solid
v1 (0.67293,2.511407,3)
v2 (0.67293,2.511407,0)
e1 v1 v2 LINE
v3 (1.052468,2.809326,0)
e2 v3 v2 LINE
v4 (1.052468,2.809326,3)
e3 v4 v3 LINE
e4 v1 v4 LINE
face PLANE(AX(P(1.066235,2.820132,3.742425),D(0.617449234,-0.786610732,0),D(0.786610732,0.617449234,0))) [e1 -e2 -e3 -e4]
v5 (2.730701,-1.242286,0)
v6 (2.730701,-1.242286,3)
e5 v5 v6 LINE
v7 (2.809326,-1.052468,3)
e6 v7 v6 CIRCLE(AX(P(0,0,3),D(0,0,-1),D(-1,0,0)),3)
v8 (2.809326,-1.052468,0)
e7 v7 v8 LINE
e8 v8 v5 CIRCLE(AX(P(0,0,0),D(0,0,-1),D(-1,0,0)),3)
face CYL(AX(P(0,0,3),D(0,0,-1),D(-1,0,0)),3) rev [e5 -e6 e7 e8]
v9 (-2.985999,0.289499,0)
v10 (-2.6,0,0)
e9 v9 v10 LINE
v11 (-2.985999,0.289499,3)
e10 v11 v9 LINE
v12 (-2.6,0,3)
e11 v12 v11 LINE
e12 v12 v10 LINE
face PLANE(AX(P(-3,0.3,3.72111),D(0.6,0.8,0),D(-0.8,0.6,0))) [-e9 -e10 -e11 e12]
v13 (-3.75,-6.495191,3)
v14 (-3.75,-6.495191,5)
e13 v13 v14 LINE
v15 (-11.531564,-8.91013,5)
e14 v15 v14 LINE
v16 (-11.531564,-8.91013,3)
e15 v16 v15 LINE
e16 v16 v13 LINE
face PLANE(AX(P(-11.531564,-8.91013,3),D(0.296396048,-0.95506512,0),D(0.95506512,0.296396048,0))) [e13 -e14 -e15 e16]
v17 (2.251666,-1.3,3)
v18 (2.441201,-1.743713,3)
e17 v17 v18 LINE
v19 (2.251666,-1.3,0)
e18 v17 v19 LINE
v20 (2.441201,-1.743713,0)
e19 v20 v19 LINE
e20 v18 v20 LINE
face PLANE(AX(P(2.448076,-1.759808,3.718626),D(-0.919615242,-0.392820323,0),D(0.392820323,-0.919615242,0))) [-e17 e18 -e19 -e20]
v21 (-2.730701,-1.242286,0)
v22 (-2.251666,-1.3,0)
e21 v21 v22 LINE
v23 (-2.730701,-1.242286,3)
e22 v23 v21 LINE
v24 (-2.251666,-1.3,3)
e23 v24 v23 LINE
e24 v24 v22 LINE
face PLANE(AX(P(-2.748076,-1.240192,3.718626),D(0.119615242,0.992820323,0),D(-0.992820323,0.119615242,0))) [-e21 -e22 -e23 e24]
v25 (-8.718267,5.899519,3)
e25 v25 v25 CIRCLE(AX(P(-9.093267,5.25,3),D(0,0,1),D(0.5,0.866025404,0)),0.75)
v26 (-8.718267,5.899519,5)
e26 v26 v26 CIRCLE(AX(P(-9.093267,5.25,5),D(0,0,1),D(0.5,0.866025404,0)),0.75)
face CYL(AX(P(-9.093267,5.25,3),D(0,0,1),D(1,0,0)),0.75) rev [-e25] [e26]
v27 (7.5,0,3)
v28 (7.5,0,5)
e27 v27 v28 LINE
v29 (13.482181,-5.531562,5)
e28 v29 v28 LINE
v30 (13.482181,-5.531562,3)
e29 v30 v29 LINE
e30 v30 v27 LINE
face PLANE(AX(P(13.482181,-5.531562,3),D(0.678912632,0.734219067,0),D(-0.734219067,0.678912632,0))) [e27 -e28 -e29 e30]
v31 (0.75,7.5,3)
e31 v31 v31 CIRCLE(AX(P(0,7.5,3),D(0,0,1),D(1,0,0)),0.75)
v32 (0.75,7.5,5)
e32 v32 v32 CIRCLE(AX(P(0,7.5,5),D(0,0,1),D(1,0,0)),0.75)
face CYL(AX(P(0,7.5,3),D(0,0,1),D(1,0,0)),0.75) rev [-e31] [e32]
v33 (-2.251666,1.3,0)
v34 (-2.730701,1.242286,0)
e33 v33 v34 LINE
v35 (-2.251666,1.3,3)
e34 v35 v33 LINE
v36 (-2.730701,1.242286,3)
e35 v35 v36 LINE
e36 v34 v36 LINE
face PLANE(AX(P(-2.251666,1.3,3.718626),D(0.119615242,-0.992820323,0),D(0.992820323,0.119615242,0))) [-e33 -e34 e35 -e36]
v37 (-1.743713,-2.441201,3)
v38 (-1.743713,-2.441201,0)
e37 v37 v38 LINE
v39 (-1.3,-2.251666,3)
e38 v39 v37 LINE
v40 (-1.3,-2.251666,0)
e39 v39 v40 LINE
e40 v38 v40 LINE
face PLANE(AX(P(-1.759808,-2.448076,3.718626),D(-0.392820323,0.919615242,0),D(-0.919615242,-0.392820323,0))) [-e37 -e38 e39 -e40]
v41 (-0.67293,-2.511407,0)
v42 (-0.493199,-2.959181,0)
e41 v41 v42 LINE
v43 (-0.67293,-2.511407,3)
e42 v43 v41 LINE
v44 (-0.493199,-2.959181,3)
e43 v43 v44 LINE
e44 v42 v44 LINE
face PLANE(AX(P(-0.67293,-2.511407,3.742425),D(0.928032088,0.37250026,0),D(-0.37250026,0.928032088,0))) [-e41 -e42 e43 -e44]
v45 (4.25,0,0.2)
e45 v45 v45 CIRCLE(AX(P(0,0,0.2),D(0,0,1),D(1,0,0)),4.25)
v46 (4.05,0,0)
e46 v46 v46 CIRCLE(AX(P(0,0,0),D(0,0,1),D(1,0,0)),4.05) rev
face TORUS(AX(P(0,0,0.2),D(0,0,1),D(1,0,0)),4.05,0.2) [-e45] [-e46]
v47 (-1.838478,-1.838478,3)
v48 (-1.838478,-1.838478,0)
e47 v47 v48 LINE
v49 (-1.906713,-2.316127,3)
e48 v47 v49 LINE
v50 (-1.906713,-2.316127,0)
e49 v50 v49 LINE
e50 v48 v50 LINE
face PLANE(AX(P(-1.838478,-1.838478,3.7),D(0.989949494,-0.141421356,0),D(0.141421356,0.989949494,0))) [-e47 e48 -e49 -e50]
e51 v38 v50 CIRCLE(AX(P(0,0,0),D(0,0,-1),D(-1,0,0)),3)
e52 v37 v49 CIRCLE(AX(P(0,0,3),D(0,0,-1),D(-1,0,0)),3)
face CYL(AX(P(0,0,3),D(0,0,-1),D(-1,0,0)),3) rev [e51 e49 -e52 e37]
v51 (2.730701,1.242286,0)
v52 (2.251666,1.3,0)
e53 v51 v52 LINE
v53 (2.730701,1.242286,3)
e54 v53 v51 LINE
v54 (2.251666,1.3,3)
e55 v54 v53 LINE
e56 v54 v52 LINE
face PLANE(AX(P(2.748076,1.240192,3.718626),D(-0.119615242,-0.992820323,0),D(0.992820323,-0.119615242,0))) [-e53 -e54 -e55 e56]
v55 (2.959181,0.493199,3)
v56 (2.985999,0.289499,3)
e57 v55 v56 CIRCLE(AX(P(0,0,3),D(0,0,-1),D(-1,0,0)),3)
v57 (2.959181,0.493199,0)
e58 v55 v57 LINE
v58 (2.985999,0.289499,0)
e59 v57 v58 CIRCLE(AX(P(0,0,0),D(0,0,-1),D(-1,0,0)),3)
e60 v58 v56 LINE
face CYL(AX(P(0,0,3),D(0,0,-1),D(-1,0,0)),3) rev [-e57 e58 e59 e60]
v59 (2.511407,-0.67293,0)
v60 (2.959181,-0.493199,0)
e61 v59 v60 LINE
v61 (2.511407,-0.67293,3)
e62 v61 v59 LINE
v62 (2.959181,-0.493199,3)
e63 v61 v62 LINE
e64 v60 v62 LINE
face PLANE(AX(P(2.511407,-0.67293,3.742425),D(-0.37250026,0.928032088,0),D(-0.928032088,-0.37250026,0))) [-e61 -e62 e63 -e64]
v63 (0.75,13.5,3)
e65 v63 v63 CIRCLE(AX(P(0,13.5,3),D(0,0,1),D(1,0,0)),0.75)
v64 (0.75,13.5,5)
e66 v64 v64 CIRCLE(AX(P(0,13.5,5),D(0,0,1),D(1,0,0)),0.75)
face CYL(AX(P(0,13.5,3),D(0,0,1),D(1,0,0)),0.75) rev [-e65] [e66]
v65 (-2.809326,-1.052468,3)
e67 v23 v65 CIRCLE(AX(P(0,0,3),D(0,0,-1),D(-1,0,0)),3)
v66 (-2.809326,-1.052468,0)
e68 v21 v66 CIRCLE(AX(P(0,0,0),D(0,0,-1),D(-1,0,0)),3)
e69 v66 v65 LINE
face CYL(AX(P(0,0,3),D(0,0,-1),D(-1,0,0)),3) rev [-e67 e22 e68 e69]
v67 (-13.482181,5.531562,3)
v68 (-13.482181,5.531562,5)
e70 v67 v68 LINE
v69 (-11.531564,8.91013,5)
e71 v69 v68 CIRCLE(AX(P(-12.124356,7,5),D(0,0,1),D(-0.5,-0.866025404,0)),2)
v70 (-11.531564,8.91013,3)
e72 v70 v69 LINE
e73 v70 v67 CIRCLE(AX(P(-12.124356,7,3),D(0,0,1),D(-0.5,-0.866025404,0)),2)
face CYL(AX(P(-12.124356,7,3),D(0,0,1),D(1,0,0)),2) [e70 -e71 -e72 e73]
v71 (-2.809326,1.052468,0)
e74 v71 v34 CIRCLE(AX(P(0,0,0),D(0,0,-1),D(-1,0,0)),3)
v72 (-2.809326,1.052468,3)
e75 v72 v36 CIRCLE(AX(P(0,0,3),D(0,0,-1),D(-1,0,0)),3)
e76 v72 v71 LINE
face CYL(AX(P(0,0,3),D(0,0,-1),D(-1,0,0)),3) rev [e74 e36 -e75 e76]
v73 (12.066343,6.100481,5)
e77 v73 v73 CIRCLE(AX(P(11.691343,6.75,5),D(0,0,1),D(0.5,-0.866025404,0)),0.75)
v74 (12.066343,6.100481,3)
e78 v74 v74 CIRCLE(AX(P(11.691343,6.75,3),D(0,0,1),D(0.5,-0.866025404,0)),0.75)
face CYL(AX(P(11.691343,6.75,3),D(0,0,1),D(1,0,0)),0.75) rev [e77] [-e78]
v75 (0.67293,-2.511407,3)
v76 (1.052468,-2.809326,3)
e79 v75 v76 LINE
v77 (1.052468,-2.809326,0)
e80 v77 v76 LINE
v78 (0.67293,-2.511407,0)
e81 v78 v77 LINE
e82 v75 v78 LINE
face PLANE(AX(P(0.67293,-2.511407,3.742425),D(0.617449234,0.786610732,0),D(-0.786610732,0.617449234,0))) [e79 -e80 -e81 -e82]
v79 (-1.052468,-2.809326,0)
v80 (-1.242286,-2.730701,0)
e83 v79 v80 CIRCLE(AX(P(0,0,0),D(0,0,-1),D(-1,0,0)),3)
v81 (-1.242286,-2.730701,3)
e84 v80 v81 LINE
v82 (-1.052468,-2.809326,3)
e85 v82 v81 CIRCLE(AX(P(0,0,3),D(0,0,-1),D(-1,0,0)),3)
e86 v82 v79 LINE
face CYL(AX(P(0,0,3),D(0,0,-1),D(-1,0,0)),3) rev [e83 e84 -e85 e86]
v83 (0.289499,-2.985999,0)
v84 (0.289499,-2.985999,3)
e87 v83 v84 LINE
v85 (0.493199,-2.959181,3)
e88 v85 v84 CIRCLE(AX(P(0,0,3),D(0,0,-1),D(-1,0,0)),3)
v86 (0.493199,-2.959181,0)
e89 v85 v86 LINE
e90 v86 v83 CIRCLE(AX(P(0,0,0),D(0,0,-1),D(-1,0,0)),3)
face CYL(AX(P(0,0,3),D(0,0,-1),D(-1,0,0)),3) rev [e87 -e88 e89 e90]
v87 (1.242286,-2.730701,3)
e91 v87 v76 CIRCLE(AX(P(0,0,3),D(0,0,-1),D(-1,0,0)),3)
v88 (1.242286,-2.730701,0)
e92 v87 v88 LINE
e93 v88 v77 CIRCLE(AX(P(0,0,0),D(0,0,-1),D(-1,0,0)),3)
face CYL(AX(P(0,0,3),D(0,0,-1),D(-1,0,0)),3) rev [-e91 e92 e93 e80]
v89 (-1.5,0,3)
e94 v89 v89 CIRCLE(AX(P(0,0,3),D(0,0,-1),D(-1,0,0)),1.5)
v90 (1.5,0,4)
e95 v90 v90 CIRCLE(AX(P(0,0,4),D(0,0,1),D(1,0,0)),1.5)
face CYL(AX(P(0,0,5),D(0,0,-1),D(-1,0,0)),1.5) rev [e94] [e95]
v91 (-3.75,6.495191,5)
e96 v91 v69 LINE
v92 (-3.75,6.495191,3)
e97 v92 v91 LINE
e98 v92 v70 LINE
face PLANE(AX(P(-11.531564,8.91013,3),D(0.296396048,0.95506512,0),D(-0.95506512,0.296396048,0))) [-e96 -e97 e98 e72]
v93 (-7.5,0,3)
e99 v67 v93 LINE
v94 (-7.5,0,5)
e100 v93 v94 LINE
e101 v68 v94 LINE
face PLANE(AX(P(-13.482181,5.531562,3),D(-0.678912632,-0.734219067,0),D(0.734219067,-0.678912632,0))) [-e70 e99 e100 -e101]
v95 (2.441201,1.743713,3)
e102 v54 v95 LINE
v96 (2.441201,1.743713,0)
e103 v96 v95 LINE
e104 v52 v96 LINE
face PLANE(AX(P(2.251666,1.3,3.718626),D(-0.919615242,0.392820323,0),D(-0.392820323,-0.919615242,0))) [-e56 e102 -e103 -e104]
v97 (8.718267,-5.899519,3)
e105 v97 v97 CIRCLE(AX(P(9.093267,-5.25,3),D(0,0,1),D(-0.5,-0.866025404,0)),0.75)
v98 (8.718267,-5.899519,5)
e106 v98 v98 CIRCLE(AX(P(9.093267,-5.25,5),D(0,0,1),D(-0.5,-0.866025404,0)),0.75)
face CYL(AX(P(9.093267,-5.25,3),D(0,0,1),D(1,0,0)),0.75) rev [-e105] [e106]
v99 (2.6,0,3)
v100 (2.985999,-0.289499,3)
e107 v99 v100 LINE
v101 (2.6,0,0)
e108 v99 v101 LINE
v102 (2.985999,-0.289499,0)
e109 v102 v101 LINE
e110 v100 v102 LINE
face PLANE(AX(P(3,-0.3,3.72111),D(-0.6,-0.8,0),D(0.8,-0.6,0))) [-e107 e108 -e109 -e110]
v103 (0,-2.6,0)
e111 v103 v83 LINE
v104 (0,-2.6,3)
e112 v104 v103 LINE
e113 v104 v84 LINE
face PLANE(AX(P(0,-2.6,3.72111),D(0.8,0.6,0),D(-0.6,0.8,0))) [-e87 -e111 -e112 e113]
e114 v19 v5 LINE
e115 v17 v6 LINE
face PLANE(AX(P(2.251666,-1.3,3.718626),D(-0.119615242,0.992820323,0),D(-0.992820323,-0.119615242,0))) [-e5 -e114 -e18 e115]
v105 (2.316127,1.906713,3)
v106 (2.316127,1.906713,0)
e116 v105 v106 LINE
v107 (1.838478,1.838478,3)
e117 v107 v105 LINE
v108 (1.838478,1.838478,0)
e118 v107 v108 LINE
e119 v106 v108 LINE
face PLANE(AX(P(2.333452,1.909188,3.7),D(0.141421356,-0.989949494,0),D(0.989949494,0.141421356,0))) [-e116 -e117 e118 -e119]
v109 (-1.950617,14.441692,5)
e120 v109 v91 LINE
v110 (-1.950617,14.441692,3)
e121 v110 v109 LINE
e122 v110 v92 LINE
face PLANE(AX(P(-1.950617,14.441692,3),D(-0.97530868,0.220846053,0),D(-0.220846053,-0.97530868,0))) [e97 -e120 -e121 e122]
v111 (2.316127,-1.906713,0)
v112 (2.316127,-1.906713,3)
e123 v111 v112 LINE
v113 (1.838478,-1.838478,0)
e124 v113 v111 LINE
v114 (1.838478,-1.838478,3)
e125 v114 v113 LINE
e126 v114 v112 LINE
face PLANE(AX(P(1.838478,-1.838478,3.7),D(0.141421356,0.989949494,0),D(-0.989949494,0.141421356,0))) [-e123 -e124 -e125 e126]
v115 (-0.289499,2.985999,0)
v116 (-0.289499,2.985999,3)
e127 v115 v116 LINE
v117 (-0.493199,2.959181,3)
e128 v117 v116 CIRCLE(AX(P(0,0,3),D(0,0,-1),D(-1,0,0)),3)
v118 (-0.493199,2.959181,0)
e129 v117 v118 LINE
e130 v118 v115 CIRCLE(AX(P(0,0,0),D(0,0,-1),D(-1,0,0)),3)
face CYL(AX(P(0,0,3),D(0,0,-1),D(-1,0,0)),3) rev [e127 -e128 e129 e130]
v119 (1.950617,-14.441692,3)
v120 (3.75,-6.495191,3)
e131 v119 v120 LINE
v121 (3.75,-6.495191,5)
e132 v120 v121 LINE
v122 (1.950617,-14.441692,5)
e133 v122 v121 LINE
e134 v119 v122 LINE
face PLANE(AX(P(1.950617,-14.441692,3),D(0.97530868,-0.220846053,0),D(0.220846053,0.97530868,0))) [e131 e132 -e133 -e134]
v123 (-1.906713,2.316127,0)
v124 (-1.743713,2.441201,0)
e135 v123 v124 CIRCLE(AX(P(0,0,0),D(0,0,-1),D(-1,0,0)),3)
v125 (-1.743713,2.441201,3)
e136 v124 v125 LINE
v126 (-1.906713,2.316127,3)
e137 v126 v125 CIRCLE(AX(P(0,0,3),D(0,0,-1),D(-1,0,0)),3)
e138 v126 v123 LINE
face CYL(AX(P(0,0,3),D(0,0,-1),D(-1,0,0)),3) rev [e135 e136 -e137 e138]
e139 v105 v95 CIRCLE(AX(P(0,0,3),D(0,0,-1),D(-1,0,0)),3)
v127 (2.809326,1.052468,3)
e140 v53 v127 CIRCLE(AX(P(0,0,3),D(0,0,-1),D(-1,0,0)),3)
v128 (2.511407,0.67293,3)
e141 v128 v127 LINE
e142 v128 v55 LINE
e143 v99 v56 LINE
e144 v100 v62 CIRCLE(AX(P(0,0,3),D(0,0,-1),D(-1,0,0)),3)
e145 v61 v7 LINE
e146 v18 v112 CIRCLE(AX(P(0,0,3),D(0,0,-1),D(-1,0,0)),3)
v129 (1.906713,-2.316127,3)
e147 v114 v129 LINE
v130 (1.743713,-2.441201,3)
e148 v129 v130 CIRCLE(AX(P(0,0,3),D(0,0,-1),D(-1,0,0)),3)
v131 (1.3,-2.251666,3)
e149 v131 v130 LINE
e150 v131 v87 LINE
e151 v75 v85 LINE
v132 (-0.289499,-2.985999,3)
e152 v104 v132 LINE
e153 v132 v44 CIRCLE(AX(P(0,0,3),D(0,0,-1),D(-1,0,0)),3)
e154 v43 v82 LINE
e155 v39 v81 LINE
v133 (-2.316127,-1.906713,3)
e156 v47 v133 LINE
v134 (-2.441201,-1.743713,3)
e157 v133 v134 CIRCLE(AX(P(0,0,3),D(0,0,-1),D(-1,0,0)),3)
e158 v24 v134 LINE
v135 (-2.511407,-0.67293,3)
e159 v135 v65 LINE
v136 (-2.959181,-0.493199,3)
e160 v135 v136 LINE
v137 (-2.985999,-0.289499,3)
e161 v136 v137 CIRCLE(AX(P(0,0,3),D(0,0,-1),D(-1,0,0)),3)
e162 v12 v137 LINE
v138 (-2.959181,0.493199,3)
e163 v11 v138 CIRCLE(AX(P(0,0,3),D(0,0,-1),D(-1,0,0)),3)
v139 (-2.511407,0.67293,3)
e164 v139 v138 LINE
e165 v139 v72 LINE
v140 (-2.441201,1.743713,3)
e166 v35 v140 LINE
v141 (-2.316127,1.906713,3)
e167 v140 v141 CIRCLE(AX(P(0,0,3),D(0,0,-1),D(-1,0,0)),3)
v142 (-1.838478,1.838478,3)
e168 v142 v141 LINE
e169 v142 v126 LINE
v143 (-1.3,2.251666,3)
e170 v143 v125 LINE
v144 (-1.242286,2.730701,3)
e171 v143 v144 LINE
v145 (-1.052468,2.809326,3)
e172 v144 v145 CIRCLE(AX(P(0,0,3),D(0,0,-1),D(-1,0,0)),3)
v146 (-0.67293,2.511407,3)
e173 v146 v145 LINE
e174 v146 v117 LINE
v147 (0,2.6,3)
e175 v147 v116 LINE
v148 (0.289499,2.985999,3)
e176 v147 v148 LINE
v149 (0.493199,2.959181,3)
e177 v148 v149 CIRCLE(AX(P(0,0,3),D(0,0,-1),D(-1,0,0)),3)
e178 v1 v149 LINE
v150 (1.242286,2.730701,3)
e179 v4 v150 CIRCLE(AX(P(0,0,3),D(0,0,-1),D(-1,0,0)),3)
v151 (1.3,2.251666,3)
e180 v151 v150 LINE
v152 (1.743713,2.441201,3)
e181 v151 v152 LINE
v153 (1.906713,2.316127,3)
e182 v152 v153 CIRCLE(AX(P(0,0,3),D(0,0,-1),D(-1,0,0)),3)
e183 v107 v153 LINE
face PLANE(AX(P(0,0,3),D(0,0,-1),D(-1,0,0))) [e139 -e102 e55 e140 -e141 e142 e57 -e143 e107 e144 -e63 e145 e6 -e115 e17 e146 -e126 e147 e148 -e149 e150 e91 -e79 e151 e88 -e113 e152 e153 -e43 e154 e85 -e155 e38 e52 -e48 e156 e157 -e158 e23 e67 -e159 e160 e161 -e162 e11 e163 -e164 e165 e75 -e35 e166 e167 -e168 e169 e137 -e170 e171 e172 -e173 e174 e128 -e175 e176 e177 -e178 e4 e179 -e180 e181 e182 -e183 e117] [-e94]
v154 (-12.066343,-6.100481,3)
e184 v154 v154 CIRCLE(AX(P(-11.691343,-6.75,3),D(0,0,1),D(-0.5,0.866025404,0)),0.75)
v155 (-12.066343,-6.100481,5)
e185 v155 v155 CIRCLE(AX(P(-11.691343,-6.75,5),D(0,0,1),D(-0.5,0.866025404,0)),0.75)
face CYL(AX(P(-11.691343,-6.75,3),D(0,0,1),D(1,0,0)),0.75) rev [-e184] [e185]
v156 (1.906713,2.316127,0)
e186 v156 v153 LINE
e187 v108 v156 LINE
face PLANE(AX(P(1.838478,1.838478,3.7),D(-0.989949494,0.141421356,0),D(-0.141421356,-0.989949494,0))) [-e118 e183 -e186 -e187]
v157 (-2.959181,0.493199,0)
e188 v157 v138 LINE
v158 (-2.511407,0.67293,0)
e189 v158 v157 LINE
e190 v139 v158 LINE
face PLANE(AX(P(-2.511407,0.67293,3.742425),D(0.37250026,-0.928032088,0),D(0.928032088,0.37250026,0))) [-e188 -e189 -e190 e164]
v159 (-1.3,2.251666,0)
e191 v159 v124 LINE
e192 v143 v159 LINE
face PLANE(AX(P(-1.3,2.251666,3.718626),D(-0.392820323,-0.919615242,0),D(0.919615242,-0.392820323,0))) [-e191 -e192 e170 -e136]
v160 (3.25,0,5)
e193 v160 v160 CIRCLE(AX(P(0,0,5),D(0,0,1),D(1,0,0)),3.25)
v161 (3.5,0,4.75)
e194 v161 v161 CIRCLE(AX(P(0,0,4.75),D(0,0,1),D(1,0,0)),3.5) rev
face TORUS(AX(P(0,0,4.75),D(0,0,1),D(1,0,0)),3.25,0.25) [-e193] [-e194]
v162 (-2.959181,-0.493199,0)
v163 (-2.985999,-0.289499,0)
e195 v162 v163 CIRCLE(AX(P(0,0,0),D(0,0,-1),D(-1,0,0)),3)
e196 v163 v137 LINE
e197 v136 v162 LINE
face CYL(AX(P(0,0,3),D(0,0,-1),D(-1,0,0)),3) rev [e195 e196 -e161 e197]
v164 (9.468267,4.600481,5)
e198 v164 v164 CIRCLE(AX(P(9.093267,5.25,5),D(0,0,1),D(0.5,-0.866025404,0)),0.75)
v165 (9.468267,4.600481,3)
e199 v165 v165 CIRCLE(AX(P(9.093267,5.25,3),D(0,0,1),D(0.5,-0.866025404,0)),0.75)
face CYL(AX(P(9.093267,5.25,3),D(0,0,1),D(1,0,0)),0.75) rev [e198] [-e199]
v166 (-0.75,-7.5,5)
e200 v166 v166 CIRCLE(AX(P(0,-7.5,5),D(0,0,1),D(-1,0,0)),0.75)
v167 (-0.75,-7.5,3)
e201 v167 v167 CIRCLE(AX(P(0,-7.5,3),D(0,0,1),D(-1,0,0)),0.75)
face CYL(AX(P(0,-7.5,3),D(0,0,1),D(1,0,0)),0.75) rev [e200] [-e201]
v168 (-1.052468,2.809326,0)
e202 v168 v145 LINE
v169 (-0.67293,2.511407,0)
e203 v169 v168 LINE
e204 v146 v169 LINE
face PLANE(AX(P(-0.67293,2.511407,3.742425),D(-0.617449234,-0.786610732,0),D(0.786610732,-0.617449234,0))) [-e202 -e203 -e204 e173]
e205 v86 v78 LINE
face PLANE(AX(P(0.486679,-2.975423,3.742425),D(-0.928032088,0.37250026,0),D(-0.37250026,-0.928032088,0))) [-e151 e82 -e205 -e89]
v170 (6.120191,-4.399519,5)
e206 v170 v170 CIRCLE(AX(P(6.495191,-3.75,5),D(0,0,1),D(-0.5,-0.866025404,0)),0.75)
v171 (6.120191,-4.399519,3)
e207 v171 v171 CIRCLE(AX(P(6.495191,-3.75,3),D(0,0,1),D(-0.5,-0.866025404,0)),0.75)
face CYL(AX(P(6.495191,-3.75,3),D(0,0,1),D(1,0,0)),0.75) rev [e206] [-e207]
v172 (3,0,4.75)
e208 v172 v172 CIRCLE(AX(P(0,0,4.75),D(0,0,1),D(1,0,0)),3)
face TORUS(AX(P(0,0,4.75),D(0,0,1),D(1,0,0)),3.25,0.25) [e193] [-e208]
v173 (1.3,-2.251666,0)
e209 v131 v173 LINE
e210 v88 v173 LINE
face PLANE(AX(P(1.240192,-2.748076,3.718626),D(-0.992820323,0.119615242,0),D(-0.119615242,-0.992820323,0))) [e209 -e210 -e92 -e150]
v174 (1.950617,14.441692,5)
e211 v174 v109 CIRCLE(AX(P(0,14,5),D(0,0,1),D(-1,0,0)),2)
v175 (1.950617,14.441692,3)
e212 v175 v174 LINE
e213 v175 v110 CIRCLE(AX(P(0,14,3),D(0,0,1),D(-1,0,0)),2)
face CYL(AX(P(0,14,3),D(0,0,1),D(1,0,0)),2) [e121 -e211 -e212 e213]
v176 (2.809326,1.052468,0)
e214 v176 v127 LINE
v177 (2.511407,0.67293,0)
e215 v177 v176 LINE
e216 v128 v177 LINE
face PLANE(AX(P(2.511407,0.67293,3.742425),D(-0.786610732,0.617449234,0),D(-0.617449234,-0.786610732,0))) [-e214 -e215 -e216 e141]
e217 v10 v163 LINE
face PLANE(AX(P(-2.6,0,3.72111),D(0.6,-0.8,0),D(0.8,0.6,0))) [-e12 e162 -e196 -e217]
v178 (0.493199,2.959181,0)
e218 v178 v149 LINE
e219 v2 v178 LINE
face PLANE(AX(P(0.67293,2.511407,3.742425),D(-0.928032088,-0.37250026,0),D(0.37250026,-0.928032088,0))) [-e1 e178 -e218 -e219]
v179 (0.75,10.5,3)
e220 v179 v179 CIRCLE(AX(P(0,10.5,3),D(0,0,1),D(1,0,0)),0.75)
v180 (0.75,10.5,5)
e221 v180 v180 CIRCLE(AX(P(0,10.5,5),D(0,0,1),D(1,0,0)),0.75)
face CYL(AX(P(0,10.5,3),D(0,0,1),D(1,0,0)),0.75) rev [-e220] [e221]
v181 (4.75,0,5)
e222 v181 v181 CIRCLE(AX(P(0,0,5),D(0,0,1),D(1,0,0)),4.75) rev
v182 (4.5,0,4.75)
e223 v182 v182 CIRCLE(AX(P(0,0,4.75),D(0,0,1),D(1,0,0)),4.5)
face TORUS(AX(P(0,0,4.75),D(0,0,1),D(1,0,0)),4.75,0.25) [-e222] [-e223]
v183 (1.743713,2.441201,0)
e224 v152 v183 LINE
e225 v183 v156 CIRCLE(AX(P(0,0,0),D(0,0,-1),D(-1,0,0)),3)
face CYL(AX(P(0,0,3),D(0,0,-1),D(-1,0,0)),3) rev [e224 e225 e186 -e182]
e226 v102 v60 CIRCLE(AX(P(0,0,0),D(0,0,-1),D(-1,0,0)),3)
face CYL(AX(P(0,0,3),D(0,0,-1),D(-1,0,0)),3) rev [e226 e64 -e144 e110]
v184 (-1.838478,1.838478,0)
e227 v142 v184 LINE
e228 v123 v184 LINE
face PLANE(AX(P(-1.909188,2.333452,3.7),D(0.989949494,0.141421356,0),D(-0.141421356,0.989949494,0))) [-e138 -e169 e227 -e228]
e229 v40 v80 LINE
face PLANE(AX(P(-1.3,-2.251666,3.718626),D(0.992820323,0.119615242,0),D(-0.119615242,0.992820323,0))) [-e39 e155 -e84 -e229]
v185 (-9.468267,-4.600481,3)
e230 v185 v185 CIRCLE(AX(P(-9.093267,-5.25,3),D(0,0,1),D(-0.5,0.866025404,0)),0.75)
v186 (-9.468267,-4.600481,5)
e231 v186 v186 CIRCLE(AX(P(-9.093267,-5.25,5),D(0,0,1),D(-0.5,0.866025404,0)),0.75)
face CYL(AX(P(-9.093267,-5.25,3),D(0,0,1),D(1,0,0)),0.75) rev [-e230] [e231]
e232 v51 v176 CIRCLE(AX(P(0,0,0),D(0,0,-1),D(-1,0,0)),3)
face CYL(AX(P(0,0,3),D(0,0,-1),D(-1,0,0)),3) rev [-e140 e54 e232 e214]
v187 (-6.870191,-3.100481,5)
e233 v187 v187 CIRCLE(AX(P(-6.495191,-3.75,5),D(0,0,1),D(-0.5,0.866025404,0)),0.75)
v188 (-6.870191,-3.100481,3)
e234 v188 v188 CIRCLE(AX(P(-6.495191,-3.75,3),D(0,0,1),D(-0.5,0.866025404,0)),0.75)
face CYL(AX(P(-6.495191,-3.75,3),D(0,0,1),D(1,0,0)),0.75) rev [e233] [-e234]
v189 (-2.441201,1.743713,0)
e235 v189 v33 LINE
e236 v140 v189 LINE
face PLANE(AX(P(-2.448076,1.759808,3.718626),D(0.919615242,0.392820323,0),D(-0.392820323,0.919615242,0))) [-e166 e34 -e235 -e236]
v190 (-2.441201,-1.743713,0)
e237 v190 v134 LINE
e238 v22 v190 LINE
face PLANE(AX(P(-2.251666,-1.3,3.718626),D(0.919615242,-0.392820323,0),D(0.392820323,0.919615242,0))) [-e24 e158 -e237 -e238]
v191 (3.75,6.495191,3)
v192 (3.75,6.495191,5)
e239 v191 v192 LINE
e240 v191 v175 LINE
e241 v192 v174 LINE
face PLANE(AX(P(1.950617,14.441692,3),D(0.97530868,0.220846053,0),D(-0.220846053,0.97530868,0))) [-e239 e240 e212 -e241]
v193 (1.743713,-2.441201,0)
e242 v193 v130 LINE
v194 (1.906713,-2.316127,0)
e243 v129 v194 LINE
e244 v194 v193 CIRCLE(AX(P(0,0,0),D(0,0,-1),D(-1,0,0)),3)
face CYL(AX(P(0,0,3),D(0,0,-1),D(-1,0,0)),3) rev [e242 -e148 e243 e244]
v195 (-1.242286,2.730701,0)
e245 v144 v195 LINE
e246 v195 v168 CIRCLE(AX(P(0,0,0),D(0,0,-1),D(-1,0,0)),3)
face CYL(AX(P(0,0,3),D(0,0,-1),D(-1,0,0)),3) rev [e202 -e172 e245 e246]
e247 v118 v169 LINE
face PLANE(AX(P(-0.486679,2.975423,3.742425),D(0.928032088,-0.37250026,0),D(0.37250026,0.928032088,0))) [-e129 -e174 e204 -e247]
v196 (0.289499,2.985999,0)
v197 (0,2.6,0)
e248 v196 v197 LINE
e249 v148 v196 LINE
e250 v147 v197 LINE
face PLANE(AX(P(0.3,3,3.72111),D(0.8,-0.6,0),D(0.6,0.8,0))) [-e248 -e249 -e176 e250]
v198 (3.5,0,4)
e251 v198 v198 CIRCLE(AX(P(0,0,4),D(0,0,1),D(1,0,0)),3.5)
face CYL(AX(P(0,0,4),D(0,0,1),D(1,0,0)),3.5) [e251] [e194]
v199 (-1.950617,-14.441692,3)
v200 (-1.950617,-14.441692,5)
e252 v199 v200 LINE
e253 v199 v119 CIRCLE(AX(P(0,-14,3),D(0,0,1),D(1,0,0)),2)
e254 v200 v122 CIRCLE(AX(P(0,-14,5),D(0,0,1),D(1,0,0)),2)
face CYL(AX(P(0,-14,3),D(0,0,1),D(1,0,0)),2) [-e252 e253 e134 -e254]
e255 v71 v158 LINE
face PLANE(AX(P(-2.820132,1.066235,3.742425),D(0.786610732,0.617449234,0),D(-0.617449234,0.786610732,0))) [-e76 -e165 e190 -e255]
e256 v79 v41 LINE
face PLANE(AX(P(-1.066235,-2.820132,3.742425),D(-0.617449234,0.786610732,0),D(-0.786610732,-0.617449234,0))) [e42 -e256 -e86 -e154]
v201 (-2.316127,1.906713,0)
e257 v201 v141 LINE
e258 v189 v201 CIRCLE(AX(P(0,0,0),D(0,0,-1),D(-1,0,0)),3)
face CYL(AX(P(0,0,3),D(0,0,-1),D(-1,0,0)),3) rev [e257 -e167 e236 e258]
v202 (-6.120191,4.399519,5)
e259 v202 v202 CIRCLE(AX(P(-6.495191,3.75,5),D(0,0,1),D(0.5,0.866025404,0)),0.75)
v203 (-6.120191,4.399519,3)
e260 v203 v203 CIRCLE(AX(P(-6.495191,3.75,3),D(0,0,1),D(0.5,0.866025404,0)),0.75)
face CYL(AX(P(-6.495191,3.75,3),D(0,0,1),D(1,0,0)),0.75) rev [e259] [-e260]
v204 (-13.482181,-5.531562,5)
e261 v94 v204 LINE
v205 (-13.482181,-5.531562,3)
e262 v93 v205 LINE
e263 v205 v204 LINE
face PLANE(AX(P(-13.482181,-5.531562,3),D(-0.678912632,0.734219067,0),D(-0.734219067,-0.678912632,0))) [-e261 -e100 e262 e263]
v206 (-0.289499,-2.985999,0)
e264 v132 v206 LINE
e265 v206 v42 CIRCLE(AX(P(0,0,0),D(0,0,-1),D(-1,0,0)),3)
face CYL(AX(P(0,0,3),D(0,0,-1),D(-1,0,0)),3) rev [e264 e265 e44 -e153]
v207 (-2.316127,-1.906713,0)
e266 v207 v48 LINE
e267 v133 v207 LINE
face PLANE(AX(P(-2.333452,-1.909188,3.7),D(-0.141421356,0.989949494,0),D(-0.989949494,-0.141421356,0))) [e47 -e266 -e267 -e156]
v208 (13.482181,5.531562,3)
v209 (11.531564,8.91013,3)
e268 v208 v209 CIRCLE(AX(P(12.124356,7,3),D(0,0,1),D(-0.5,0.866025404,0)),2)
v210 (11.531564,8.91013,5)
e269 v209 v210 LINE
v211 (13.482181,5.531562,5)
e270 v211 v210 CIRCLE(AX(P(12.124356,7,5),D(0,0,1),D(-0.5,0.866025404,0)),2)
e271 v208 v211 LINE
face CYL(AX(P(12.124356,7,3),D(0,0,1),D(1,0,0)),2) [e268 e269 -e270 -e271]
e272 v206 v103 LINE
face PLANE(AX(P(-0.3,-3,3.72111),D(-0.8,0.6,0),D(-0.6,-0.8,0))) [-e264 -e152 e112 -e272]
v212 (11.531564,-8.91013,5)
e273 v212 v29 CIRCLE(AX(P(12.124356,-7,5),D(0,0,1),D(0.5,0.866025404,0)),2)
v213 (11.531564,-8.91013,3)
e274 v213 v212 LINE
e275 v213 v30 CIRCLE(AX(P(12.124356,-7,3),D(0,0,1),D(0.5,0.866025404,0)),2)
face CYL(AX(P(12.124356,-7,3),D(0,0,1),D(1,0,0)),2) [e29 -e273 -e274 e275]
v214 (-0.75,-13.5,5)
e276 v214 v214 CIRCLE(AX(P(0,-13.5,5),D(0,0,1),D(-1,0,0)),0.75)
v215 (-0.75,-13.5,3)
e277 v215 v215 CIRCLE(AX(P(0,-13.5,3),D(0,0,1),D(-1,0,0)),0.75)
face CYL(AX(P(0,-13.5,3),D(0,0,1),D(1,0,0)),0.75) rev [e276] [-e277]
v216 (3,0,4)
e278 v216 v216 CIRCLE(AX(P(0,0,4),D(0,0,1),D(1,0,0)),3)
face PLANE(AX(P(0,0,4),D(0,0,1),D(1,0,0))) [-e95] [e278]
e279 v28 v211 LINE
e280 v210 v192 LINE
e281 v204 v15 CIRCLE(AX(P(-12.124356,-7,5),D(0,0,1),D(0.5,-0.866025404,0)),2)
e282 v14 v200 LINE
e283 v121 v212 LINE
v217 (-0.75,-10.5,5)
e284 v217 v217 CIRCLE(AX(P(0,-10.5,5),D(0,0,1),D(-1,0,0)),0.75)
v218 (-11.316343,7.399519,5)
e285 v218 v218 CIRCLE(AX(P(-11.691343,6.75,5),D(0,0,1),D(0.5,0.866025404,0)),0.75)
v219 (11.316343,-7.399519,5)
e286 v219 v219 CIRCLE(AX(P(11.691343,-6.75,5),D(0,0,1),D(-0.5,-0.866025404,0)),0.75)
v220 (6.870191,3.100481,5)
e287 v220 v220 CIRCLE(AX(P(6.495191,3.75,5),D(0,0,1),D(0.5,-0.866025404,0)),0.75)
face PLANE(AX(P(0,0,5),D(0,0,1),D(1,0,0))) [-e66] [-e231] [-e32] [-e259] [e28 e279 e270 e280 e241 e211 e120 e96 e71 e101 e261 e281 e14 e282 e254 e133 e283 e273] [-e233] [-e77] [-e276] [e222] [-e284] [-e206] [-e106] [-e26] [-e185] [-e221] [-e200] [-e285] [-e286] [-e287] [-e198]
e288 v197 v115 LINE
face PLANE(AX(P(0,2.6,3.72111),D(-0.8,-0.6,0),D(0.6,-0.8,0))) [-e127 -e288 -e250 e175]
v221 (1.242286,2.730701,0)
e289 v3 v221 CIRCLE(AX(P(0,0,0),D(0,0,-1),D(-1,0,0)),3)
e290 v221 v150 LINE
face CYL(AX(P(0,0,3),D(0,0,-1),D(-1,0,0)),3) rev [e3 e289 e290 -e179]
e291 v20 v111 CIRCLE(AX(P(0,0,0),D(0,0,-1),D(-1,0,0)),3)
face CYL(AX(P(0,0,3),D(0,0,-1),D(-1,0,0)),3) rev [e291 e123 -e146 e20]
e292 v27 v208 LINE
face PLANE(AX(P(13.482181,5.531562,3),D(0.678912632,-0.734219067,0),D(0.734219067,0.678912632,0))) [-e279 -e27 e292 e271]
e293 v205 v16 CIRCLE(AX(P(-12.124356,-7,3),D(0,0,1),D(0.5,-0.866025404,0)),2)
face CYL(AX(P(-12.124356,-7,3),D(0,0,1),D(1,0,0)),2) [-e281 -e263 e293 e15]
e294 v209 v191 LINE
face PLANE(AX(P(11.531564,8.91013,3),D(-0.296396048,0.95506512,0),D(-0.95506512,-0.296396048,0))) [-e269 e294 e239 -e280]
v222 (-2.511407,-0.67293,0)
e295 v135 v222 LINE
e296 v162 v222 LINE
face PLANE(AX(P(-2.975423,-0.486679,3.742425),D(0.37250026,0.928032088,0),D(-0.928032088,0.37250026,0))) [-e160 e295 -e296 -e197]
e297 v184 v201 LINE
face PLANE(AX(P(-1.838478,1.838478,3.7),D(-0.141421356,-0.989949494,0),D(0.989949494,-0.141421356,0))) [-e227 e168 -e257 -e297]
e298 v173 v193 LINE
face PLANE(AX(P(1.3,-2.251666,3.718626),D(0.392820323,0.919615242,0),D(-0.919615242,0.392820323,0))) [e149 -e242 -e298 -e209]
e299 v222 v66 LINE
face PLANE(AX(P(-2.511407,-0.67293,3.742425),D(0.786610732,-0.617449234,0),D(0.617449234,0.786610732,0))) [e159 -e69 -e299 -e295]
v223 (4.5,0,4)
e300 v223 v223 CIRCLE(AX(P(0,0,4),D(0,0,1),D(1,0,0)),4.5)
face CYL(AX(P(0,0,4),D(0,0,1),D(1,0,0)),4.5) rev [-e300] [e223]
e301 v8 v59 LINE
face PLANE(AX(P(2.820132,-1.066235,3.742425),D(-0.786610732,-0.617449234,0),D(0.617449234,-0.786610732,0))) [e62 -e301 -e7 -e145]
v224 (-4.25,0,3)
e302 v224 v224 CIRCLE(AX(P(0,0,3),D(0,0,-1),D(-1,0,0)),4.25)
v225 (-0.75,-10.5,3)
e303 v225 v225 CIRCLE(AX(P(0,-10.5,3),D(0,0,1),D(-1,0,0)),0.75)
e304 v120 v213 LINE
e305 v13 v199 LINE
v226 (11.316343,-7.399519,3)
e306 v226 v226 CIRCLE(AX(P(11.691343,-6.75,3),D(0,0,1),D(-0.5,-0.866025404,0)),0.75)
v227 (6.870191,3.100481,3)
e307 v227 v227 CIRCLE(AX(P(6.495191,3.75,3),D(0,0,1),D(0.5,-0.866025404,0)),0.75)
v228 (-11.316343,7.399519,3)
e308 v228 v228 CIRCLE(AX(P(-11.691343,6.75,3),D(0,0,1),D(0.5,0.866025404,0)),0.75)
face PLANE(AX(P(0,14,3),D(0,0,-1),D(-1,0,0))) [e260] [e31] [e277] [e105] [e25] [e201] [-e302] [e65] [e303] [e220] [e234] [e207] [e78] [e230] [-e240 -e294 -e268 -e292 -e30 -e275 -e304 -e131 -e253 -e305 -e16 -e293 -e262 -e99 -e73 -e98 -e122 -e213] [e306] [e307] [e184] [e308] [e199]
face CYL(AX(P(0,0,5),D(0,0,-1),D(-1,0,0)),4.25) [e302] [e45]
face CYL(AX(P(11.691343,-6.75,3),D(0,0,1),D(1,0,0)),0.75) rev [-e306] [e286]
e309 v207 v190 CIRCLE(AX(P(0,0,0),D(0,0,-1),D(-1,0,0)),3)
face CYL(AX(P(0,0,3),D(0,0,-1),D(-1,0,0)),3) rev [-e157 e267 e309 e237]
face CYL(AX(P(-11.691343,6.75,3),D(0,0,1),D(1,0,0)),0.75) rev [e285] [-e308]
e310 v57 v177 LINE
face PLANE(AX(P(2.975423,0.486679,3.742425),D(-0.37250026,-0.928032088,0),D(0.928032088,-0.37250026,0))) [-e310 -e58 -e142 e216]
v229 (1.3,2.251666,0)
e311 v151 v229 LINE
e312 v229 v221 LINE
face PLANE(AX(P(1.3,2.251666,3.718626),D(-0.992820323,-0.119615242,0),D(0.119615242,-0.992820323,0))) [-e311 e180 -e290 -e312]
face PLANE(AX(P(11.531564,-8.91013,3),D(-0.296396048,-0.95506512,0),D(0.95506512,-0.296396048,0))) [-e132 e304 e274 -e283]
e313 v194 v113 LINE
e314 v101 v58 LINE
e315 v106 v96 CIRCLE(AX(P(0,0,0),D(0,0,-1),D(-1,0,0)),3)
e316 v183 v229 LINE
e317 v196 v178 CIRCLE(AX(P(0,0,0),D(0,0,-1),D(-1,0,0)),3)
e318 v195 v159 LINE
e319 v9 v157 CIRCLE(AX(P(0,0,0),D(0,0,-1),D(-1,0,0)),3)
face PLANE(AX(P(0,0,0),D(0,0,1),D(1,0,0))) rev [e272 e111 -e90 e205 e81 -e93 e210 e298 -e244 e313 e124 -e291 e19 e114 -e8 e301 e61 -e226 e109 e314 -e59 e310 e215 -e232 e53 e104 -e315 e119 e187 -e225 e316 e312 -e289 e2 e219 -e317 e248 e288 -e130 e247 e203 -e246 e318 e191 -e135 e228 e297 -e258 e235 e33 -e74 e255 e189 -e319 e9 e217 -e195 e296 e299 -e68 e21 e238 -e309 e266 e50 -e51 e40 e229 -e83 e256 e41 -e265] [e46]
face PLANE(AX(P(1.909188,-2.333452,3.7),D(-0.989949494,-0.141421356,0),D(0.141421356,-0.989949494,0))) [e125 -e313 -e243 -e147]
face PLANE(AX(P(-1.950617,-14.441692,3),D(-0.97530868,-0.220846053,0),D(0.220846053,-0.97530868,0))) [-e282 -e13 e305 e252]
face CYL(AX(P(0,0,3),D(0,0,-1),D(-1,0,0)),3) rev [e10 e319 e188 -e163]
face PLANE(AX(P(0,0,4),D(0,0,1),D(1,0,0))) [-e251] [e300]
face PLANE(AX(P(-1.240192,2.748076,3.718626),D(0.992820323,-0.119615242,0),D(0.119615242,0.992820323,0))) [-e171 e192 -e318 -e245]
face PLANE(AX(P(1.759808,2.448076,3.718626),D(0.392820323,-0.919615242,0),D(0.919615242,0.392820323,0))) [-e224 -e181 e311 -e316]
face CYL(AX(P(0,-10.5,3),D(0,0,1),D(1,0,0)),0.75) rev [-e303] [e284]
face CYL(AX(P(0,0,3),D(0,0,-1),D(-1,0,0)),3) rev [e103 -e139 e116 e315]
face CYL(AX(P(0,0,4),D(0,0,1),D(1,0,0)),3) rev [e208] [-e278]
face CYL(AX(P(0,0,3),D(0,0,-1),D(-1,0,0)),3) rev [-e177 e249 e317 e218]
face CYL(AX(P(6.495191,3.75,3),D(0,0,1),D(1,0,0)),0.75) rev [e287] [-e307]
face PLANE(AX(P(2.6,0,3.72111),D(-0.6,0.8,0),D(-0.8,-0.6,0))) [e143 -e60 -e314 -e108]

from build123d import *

# Parameters (mm, degrees)
ESQUISSE1_R                  = 4.25
ESQUISSE1_R_2                = 1.5
BOSS_EXTRU_1_DEPTH           = 5
ESQUISSE2_R                  = 3
ENL_V_MAT_EXTRU_1_DEPTH      = 3
BOSS_EXTRU_2_DEPTH           = 3
R_P_TITION_CIRCULAIRE1_DEPTH = 3
ESQUISSE4_R                  = 0.75
BOSS_EXTRU_3_DEPTH           = 2
R_P_TITION_CIRCULAIRE2_COUNT = 6
ENL_V_START                  = -1
ESQUISSE5_R                  = 3
ENL_V_MAT_EXTRU_2_DEPTH      = 1
CONG_1_R                     = 0.2
ESQUISSE6_R                  = 4.5
ESQUISSE6_R_2                = 3.5
ENL_V_MAT_EXTRU_3_DEPTH      = 1
CONG_2_R                     = 0.25


# Read off the part's stored shape, not the designer's step: Répétition circulaire1
with BuildPart() as part:
    # Esquisse1 → Boss.-Extru.1 (new body)
    with BuildSketch(Plane.XY):
        Circle(ESQUISSE1_R)
        Circle(ESQUISSE1_R_2, mode=Mode.SUBTRACT)
    extrude(amount=BOSS_EXTRU_1_DEPTH)

    # Esquisse2 → Enlèv. mat.-Extru.1 (cut)
    with BuildSketch(Plane(origin=(0, 0, 0), x_dir=(-1, 0, 0), z_dir=(0, 0, -1))):
        Circle(ESQUISSE2_R)
    extrude(amount=-ENL_V_MAT_EXTRU_1_DEPTH, mode=Mode.SUBTRACT)

    # Esquisse3 → Boss.-Extru.2 (add)
    with BuildSketch(Plane(origin=(0, 0, 0), x_dir=(-1, 0, 0), z_dir=(0, 0, -1))):
        Polygon((-0.3, 3), (0, 2.6), (0.3, 3), align=None)
    extrude(amount=-BOSS_EXTRU_2_DEPTH)

    # Répétition circulaire1 outline → Répétition circulaire1 (add)
    with BuildSketch(Plane.XY):
        with BuildLine():
            ThreePointArc((1.052468236, 2.80932565), (0.776457135, 2.897777479), (0.493198596, 2.959181499))
            Line((0.493198596, 2.959181499), (0.672929517, 2.511407148))
            Line((0.672929517, 2.511407148), (1.052468236, 2.80932565))
        make_face()
        with BuildLine():
            ThreePointArc((-0.493198596, 2.959181499), (-0.776457135, 2.897777479), (-1.052468236, 2.80932565))
            Line((-1.052468236, 2.80932565), (-0.672929517, 2.511407148))
            Line((-0.672929517, 2.511407148), (-0.493198596, 2.959181499))
        make_face()
        with BuildLine():
            ThreePointArc((-1.242285791, 2.730700645), (-1.5, 2.598076211), (-1.743713233, 2.441201376))
            Line((-1.743713233, 2.441201376), (-1.3, 2.25166605))
            Line((-1.3, 2.25166605), (-1.242285791, 2.730700645))
        make_face()
        with BuildLine():
            ThreePointArc((-1.906713263, 2.316127054), (-2.121320343, 2.121320343), (-2.316127054, 1.906713263))
            Line((-2.316127054, 1.906713263), (-1.838477631, 1.838477631))
            Line((-1.838477631, 1.838477631), (-1.906713263, 2.316127054))
        make_face()
        with BuildLine():
            ThreePointArc((-2.441201376, 1.743713233), (-2.598076211, 1.5), (-2.730700645, 1.242285791))
            Line((-2.730700645, 1.242285791), (-2.25166605, 1.3))
            Line((-2.25166605, 1.3), (-2.441201376, 1.743713233))
        make_face()
        with BuildLine():
            ThreePointArc((-2.809325651, 1.052468236), (-2.897777479, 0.776457135), (-2.959181499, 0.493198596))
            Line((-2.959181499, 0.493198596), (-2.511407148, 0.672929517))
            Line((-2.511407148, 0.672929517), (-2.809325651, 1.052468236))
        make_face()
        with BuildLine():
            ThreePointArc((-2.985999024, 0.289499268), (-3, 0), (-2.985999024, -0.289499268))
            Line((-2.985999024, -0.289499268), (-2.6, 0))
            Line((-2.6, 0), (-2.985999024, 0.289499268))
        make_face()
        with BuildLine():
            ThreePointArc((-2.959181499, -0.493198596), (-2.897777479, -0.776457135), (-2.809325651, -1.052468236))
            Line((-2.809325651, -1.052468236), (-2.511407148, -0.672929517))
            Line((-2.511407148, -0.672929517), (-2.959181499, -0.493198596))
        make_face()
        with BuildLine():
            ThreePointArc((-2.730700645, -1.242285791), (-2.598076211, -1.5), (-2.441201377, -1.743713233))
            Line((-2.441201377, -1.743713233), (-2.25166605, -1.3))
            Line((-2.25166605, -1.3), (-2.730700645, -1.242285791))
        make_face()
        with BuildLine():
            ThreePointArc((-2.316127055, -1.906713263), (-2.121320344, -2.121320344), (-1.906713263, -2.316127055))
            Line((-1.906713263, -2.316127055), (-1.838477631, -1.838477631))
            Line((-1.838477631, -1.838477631), (-2.316127055, -1.906713263))
        make_face()
        with BuildLine():
            ThreePointArc((-1.743713233, -2.441201377), (-1.5, -2.598076211), (-1.242285791, -2.730700645))
            Line((-1.242285791, -2.730700645), (-1.3, -2.25166605))
            Line((-1.3, -2.25166605), (-1.743713233, -2.441201377))
        make_face()
        with BuildLine():
            ThreePointArc((-1.052468236, -2.809325651), (-0.776457135, -2.897777479), (-0.493198596, -2.959181499))
            Line((-0.493198596, -2.959181499), (-0.672929517, -2.511407148))
            Line((-0.672929517, -2.511407148), (-1.052468236, -2.809325651))
        make_face()
        with BuildLine():
            ThreePointArc((-0.289499268, -2.985999024), (0, -3), (0.289499268, -2.985999024))
            Line((0.289499268, -2.985999024), (0, -2.6))
            Line((0, -2.6), (-0.289499268, -2.985999024))
        make_face()
        with BuildLine():
            ThreePointArc((0.493198596, -2.959181499), (0.776457135, -2.897777479), (1.052468236, -2.809325651))
            Line((1.052468236, -2.809325651), (0.672929517, -2.511407148))
            Line((0.672929517, -2.511407148), (0.493198596, -2.959181499))
        make_face()
        with BuildLine():
            ThreePointArc((1.242285791, -2.730700645), (1.5, -2.598076211), (1.743713233, -2.441201377))
            Line((1.743713233, -2.441201377), (1.3, -2.25166605))
            Line((1.3, -2.25166605), (1.242285791, -2.730700645))
        make_face()
        with BuildLine():
            ThreePointArc((1.906713263, -2.316127055), (2.121320344, -2.121320344), (2.316127055, -1.906713263))
            Line((2.316127055, -1.906713263), (1.838477631, -1.838477631))
            Line((1.838477631, -1.838477631), (1.906713263, -2.316127055))
        make_face()
        with BuildLine():
            ThreePointArc((2.441201377, -1.743713233), (2.598076211, -1.5), (2.730700645, -1.242285791))
            Line((2.730700645, -1.242285791), (2.25166605, -1.3))
            Line((2.25166605, -1.3), (2.441201377, -1.743713233))
        make_face()
        with BuildLine():
            ThreePointArc((2.809325651, -1.052468236), (2.897777479, -0.776457135), (2.959181499, -0.493198596))
            Line((2.959181499, -0.493198596), (2.511407148, -0.672929517))
            Line((2.511407148, -0.672929517), (2.809325651, -1.052468236))
        make_face()
        with BuildLine():
            ThreePointArc((2.985999024, -0.289499268), (3, 0), (2.985999024, 0.289499268))
            Line((2.985999024, 0.289499268), (2.6, 0))
            Line((2.6, 0), (2.985999024, -0.289499268))
        make_face()
        with BuildLine():
            ThreePointArc((2.959181499, 0.493198596), (2.897777479, 0.776457135), (2.809325651, 1.052468236))
            Line((2.809325651, 1.052468236), (2.511407148, 0.672929517))
            Line((2.511407148, 0.672929517), (2.959181499, 0.493198596))
        make_face()
        with BuildLine():
            ThreePointArc((2.730700645, 1.242285791), (2.598076211, 1.5), (2.441201376, 1.743713233))
            Line((2.441201376, 1.743713233), (2.25166605, 1.3))
            Line((2.25166605, 1.3), (2.730700645, 1.242285791))
        make_face()
        with BuildLine():
            ThreePointArc((2.316127054, 1.906713263), (2.121320343, 2.121320343), (1.906713263, 2.316127054))
            Line((1.906713263, 2.316127054), (1.838477631, 1.838477631))
            Line((1.838477631, 1.838477631), (2.316127054, 1.906713263))
        make_face()
        with BuildLine():
            ThreePointArc((1.743713233, 2.441201376), (1.5, 2.598076211), (1.242285791, 2.730700645))
            Line((1.242285791, 2.730700645), (1.3, 2.25166605))
            Line((1.3, 2.25166605), (1.743713233, 2.441201376))
        make_face()
    extrude(amount=R_P_TITION_CIRCULAIRE1_DEPTH)

    # Esquisse4 → Boss.-Extru.3 (add)
    with BuildSketch(Plane.XY.offset(5)):
        with BuildLine():
            Line((-1.95061736, 14.441692106), (-3.75, 6.495190528))
            Line((-3.75, 6.495190528), (-3.75, 2))
            Line((-3.75, 2), (0, 3.364888378))
            Line((0, 3.364888378), (3.75, 2))
            Line((3.75, 2), (3.75, 6.495190528))
            Line((3.75, 6.495190528), (1.95061736, 14.441692106))
            ThreePointArc((1.95061736, 14.441692106), (0, 16), (-1.95061736, 14.441692106))
        make_face()
        with Locations((0, 7.5)):
            Circle(ESQUISSE4_R, mode=Mode.SUBTRACT)
        with Locations((0, 10.5)):
            Circle(ESQUISSE4_R, mode=Mode.SUBTRACT)
        with Locations((0, 13.5)):
            Circle(ESQUISSE4_R, mode=Mode.SUBTRACT)
    boss_extru_3 = extrude(amount=-BOSS_EXTRU_3_DEPTH)

    # Répétition circulaire2: Boss.-Extru.3 ×6 about axis
    r_p_tition_circulaire2_axis = Axis((0, 0, 0), (0, 0, 1))
    for i in range(1, R_P_TITION_CIRCULAIRE2_COUNT):
        add(boss_extru_3.rotate(r_p_tition_circulaire2_axis, i * 360 / R_P_TITION_CIRCULAIRE2_COUNT))

    # Esquisse5 → Enlèv. mat.-Extru.2 (cut)
    with BuildSketch(Plane.XY.offset(5).offset(ENL_V_START)):
        Circle(ESQUISSE5_R)
    extrude(amount=ENL_V_MAT_EXTRU_2_DEPTH, mode=Mode.SUBTRACT)

    # Congé1
    cong_1_edges = [part.edges().sort_by_distance(p)[0] for p in [
        (-4.25, 0, 0),
    ]]
    fillet(cong_1_edges, radius=CONG_1_R)

    # Esquisse6 → Enlèv. mat.-Extru.3 (cut)
    with BuildSketch(Plane.XY.offset(5)):
        Circle(ESQUISSE6_R)
        Circle(ESQUISSE6_R_2, mode=Mode.SUBTRACT)
    extrude(amount=-ENL_V_MAT_EXTRU_3_DEPTH, mode=Mode.SUBTRACT)

    # Congé2
    cong_2_edges = [part.edges().sort_by_distance(p)[0] for p in [
        (-3, 0, 5),
        (-4.5, 0, 5),
        (-3.5, 0, 5),
    ]]
    fillet(cong_2_edges, radius=CONG_2_R - 0.0001)  # a hair under: the kernel refuses the full size


solid = part.part
